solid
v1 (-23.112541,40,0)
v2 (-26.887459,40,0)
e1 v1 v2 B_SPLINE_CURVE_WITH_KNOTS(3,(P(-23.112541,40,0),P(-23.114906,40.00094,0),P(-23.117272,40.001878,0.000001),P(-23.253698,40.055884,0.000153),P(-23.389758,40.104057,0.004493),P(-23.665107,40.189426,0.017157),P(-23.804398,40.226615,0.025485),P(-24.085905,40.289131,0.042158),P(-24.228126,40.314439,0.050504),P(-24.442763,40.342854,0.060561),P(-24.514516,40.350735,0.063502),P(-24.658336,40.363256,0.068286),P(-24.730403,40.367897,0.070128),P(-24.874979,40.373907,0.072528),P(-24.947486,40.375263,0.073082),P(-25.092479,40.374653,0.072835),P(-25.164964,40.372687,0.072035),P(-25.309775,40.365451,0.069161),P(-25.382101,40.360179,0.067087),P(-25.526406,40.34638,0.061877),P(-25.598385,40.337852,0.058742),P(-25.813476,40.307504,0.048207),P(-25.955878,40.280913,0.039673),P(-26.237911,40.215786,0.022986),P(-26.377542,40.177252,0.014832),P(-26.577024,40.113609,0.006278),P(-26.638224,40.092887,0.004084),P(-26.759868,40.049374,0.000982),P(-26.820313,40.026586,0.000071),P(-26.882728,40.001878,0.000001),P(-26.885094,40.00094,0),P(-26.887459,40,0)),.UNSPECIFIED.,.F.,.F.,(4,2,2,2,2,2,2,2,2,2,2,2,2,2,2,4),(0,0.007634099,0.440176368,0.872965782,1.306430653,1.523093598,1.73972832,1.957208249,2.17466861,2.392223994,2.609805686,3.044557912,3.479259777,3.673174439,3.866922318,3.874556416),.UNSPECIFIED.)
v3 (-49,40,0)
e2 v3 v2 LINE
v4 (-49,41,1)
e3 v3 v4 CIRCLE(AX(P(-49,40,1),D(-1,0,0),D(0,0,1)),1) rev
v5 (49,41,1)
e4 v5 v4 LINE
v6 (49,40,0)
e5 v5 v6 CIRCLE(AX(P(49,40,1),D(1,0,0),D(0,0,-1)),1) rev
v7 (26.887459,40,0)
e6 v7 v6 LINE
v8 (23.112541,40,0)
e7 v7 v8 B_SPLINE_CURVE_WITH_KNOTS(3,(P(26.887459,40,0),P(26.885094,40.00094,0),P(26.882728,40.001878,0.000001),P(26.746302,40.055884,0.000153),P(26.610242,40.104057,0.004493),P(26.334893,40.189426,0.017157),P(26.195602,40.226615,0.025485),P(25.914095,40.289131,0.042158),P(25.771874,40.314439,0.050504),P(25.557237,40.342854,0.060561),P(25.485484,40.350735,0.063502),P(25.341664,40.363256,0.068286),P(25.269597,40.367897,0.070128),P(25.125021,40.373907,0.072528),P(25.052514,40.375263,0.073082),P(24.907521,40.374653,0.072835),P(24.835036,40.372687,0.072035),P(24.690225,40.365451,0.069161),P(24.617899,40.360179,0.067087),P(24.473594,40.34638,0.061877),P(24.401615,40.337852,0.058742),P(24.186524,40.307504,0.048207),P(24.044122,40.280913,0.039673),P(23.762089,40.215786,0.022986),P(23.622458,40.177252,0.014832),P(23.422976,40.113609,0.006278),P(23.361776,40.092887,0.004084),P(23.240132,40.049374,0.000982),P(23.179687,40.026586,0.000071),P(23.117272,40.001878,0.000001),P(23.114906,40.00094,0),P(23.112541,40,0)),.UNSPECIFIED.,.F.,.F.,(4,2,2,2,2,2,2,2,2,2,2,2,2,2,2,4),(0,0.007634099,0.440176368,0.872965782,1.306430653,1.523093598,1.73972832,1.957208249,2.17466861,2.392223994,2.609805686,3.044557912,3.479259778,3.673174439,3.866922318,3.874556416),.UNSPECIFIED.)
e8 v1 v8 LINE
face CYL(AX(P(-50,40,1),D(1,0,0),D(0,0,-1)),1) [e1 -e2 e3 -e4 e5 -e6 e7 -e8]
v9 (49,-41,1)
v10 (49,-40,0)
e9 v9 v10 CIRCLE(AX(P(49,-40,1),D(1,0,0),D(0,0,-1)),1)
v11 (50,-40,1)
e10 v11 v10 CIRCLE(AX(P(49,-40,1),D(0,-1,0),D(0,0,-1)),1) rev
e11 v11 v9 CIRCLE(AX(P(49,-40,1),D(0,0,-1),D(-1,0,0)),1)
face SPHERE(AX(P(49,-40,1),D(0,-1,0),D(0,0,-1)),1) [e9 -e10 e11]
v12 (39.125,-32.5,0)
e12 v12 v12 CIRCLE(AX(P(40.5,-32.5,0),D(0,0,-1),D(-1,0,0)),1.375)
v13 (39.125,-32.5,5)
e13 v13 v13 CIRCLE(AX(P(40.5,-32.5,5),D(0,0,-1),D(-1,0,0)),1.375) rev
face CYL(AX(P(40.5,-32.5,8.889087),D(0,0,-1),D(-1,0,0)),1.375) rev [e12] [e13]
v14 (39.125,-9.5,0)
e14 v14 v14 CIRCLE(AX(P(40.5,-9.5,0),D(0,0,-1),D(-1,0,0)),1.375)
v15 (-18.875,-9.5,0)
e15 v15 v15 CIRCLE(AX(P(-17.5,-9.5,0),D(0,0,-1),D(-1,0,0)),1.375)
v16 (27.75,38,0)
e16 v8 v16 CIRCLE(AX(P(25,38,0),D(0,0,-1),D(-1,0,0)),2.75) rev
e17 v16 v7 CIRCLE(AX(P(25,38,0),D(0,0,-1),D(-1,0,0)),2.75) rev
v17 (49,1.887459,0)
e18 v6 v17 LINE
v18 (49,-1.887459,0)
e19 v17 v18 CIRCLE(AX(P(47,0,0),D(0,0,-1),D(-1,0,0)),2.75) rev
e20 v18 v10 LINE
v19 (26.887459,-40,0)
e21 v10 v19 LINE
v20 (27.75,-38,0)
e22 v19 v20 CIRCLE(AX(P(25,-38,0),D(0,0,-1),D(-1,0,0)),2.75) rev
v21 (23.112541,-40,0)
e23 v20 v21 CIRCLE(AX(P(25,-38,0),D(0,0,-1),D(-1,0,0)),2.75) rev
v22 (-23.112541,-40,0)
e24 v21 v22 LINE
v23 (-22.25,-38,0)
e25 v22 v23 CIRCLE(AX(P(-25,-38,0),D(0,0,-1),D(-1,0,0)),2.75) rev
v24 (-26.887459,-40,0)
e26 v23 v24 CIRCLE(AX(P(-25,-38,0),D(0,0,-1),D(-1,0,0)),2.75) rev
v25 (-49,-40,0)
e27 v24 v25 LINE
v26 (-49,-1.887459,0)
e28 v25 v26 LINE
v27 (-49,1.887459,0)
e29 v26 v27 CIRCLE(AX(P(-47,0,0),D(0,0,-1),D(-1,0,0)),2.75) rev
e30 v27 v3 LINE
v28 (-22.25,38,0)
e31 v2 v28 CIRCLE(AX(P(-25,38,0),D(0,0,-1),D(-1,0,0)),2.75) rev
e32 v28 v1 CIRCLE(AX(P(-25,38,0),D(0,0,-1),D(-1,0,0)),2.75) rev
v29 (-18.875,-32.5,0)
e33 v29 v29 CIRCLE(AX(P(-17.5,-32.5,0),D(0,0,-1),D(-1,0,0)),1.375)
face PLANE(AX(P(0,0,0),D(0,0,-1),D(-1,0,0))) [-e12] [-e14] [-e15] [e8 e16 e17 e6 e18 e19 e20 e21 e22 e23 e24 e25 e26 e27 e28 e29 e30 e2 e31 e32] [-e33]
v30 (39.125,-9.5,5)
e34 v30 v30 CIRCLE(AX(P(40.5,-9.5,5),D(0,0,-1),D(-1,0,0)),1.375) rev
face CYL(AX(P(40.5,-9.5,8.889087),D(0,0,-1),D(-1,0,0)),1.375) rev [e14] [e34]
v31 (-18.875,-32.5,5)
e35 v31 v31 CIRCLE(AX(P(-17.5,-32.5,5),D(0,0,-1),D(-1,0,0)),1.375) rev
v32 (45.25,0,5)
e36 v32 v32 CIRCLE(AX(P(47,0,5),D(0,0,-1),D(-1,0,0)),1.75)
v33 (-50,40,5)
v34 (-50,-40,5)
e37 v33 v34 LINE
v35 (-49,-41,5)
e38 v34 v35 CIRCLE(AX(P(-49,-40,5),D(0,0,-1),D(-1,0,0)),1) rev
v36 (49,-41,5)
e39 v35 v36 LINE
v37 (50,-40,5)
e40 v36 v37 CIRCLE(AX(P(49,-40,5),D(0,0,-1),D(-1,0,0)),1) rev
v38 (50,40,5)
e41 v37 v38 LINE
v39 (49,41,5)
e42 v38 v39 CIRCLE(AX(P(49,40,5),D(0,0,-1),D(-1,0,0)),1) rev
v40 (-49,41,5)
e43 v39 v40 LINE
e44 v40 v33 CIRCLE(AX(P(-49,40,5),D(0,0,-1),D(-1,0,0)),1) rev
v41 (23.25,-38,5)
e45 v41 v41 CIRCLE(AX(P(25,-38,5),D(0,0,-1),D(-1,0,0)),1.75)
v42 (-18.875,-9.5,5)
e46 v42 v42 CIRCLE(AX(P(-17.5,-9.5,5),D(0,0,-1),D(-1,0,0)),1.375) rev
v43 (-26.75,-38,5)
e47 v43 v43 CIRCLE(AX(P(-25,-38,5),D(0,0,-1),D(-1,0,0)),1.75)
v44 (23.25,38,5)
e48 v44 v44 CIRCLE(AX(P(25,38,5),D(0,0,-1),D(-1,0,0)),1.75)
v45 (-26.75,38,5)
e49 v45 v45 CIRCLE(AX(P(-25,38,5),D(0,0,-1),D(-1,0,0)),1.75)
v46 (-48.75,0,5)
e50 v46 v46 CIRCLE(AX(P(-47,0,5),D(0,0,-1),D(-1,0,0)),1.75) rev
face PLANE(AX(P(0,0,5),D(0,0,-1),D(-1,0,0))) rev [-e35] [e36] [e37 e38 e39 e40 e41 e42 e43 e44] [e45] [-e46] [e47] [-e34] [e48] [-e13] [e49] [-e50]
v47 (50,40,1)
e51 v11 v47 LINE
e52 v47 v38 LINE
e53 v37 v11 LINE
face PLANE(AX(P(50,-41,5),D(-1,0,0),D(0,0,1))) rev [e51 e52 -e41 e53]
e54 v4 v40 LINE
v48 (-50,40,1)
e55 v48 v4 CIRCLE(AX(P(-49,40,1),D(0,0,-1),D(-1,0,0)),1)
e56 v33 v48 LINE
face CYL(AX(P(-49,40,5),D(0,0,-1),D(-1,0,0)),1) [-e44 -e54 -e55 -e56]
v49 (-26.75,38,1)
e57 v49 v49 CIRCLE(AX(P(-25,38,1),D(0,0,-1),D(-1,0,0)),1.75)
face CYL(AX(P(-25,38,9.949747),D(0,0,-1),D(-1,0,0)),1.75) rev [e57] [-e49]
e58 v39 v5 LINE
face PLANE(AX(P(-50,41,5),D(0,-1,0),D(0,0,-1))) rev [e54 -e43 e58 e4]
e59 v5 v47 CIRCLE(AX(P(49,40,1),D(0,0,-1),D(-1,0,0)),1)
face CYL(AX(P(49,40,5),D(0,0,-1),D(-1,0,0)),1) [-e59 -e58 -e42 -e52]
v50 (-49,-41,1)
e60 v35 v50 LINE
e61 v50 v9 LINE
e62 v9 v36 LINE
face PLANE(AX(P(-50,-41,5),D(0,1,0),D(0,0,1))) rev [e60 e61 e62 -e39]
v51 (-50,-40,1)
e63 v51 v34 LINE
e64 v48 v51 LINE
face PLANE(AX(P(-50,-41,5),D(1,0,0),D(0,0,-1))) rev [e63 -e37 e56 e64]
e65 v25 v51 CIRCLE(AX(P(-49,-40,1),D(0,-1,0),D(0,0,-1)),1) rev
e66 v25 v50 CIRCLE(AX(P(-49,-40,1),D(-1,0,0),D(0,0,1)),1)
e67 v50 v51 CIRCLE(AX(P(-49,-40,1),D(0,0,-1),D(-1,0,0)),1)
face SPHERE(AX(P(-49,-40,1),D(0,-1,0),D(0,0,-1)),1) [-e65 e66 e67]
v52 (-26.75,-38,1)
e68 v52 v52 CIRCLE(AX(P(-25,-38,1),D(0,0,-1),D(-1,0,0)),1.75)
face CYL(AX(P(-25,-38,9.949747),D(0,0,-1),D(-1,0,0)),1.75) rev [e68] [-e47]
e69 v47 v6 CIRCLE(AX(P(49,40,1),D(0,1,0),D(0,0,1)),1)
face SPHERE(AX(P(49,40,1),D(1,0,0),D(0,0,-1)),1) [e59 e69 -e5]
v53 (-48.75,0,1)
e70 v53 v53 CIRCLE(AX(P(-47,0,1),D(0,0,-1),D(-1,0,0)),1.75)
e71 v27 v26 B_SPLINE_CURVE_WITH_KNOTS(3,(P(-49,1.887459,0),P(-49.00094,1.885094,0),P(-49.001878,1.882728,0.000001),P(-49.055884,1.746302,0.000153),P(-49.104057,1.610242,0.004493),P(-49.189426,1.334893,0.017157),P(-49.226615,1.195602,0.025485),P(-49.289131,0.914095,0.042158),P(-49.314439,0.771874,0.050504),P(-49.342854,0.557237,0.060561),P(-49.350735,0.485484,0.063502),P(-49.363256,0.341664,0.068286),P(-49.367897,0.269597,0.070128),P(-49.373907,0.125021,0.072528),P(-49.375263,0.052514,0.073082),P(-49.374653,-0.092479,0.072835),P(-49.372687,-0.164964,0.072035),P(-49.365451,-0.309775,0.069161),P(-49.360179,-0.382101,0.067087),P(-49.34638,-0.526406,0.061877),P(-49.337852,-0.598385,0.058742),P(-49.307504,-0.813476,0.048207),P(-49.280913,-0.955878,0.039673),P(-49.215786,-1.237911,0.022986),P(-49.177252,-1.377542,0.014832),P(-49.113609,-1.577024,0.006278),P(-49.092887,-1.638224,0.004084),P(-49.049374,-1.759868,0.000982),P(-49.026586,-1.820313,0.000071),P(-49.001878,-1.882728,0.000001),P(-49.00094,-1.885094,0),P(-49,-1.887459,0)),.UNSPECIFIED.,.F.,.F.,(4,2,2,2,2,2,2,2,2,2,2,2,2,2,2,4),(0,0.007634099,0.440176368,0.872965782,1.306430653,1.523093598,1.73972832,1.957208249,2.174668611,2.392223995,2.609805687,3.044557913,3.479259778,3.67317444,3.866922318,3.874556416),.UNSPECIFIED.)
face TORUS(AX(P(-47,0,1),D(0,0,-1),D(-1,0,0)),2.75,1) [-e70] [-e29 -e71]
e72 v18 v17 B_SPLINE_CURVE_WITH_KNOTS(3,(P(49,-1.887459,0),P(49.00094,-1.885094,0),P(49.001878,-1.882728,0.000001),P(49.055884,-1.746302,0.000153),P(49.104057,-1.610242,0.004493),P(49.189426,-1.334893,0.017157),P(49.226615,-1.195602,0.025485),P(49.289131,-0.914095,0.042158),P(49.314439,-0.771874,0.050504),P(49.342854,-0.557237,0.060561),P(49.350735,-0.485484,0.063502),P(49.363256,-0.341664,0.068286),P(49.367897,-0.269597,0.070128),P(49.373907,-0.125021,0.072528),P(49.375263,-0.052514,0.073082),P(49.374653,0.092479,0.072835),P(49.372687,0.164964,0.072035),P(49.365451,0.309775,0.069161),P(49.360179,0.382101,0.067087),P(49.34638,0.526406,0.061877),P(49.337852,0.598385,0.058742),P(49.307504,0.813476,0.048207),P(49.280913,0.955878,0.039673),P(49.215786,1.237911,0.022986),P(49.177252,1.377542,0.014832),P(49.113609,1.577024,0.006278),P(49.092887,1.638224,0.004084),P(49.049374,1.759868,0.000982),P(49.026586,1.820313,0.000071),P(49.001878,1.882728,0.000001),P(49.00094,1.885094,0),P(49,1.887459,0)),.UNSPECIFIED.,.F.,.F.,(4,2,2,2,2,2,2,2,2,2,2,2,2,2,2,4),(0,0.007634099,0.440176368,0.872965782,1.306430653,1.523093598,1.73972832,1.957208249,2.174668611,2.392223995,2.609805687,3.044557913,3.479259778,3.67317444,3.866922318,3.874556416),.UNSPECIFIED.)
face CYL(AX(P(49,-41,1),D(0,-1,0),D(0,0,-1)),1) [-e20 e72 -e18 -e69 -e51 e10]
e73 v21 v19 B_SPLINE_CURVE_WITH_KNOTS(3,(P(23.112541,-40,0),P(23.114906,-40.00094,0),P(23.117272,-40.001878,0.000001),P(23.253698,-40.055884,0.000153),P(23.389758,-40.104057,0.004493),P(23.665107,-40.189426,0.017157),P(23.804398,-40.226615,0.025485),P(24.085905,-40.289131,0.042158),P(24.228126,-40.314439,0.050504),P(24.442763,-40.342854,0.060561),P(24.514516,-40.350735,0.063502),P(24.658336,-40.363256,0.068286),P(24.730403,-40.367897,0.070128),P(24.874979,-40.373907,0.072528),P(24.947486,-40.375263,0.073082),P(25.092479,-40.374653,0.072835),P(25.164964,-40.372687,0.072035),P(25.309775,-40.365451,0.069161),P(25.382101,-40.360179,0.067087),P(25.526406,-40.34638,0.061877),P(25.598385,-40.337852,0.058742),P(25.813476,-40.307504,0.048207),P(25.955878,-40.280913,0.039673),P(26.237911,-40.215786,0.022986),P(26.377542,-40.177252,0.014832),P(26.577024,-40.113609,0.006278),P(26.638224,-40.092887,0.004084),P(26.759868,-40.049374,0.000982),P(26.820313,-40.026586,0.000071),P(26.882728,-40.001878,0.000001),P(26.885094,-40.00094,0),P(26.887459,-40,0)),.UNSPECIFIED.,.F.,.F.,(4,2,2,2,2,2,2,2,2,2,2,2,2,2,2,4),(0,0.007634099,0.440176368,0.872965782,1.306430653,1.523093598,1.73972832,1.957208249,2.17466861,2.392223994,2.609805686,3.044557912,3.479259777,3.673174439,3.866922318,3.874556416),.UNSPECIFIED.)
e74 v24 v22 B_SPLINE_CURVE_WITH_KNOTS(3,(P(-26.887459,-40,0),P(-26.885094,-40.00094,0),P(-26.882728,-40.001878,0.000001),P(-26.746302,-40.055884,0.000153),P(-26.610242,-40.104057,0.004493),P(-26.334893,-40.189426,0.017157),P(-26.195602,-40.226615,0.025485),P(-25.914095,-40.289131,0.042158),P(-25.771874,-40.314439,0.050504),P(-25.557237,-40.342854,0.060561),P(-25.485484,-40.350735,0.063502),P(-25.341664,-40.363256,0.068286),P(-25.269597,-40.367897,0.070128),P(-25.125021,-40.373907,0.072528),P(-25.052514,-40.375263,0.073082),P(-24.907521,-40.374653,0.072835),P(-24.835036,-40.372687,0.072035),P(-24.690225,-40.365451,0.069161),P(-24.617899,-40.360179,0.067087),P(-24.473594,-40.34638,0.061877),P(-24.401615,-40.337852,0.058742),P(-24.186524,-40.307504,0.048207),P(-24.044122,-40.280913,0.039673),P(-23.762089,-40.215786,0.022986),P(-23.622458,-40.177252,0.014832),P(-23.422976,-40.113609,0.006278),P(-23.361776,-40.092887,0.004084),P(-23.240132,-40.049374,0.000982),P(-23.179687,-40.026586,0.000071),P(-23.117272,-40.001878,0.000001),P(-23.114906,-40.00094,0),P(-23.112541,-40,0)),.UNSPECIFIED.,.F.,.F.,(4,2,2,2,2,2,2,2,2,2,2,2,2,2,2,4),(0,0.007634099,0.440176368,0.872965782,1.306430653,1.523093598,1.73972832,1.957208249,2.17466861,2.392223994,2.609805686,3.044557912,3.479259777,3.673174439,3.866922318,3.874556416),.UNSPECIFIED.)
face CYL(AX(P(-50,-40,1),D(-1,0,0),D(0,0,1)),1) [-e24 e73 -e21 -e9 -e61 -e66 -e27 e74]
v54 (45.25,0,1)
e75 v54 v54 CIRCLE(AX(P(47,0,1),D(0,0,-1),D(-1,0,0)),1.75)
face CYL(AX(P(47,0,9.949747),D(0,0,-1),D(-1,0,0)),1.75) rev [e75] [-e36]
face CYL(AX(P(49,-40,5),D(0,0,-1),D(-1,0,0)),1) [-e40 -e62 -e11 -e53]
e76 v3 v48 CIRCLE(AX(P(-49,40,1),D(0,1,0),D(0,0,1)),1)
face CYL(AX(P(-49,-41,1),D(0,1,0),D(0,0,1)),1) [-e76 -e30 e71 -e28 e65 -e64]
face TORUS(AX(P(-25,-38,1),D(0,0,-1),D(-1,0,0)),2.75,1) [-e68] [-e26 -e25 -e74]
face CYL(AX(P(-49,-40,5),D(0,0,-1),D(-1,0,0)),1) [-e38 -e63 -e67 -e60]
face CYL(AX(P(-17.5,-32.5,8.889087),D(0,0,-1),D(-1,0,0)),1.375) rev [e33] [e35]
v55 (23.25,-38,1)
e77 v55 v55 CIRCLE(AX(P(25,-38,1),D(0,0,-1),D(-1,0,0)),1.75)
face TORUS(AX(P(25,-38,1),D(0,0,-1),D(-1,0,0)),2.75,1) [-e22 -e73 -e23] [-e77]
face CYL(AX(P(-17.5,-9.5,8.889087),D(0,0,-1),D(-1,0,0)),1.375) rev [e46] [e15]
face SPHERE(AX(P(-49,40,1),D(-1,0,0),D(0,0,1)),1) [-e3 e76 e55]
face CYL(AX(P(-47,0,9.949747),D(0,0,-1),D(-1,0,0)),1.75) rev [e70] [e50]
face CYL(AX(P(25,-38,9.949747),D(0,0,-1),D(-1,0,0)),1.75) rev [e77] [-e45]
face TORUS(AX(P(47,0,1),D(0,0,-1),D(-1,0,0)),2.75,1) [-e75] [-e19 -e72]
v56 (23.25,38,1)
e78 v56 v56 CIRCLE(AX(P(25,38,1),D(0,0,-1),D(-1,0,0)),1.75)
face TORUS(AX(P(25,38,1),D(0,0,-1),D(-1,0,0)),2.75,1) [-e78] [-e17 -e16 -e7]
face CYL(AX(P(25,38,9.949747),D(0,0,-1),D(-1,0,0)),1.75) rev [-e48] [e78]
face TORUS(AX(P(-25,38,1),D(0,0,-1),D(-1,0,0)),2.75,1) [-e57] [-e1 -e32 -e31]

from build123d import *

# Parameters (mm, degrees)
ESQUISSE1_W             = 100
ESQUISSE1_H             = 82
BOSS_EXTRU_1_DEPTH      = 5
ESQUISSE2_R             = 1.75
ENL_V_MAT_EXTRU_1_DEPTH = 5
ESQUISSE3_R             = 1.75
ENL_V_MAT_EXTRU_2_DEPTH = 5
CONG_2_R                = 1
ESQUISSE8_R             = 1.375
ENL_V_MAT_EXTRU_6_DEPTH = 5


with BuildPart() as part:
    # Esquisse1 → Boss.-Extru.1 (new body)
    with BuildSketch(Plane.XY):
        Rectangle(ESQUISSE1_W, ESQUISSE1_H)
    extrude(amount=BOSS_EXTRU_1_DEPTH)

    # Esquisse2 → Enlèv. mat.-Extru.1 (cut)
    with BuildSketch(Plane.XY):
        with Locations(Location((-25, -38, 0), (0, 0, 180))):
            Circle(ESQUISSE2_R)
        with Locations(Location((25, -38, 0), (0, 0, 180))):
            Circle(ESQUISSE2_R)
        with Locations(Location((-25, 38, 0), (0, 0, 180))):
            Circle(ESQUISSE2_R)
        with Locations(Location((25, 38, 0), (0, 0, 180))):
            Circle(ESQUISSE2_R)
    extrude(amount=ENL_V_MAT_EXTRU_1_DEPTH, mode=Mode.SUBTRACT)

    # Esquisse3 → Enlèv. mat.-Extru.2 (cut)
    with BuildSketch(Plane.XY):
        with Locations(Location((47, 0, 0), (0, 0, 180))):
            Circle(ESQUISSE3_R)
    enl_v_mat_extru_2 = extrude(amount=ENL_V_MAT_EXTRU_2_DEPTH, mode=Mode.SUBTRACT)

    # Symétrie1: Enlèv. mat.-Extru.2 across plane
    add(enl_v_mat_extru_2.mirror(Plane(origin=(0, 0, 0), x_dir=(0, 0, 1), z_dir=(1, 0, 0))), mode=Mode.SUBTRACT)

    # Congé2
    # the kernel refuses this fillet: 1 mm, written as the material it takes off along each edge
    with BuildSketch(Plane(origin=(-49, -40, 1), x_dir=(-1, 0, 0), z_dir=(0, -1, 0))) as cong_2_piece_1_section:
        Polygon((0, 0), (CONG_2_R, 0), (CONG_2_R, CONG_2_R), (0, CONG_2_R), align=None)
    cong_2_piece_1 = extrude(amount=CONG_2_R, mode=Mode.PRIVATE)
    cong_2_piece_1 = cong_2_piece_1 - Plane(origin=(-49, -40, 1), x_dir=(0.7071067811865475, 0, 0.7071067811865475), z_dir=(0, -1, 0)) * Sphere(CONG_2_R, mode=Mode.PRIVATE)
    add(cong_2_piece_1, mode=Mode.SUBTRACT)
    with BuildSketch(Plane(origin=(49, -40, 1), x_dir=(1, 0, 0), z_dir=(0, -1, 0))) as cong_2_piece_2_section:
        Polygon((0, 0), (CONG_2_R, 0), (CONG_2_R, -CONG_2_R), (0, -CONG_2_R), align=None)
    cong_2_piece_2 = extrude(amount=CONG_2_R, mode=Mode.PRIVATE)
    cong_2_piece_2 = cong_2_piece_2 - Plane(origin=(49, -40, 1), x_dir=(-0.7071067811865475, 0, 0.7071067811865475), z_dir=(0, -1, 0)) * Sphere(CONG_2_R, mode=Mode.PRIVATE)
    add(cong_2_piece_2, mode=Mode.SUBTRACT)
    with BuildSketch(Plane(origin=(-49, 40, 1), x_dir=(0, 0, -1), z_dir=(-1, 0, 0))) as cong_2_piece_3_section:
        Polygon((0, 0), (CONG_2_R, 0), (CONG_2_R, -CONG_2_R), (0, -CONG_2_R), align=None)
    cong_2_piece_3 = extrude(amount=CONG_2_R, mode=Mode.PRIVATE)
    cong_2_piece_3 = cong_2_piece_3 - Plane(origin=(-49, 40, 1), x_dir=(0, -0.7071067811865475, 0.7071067811865475), z_dir=(-1, 0, 0)) * Sphere(CONG_2_R, mode=Mode.PRIVATE)
    add(cong_2_piece_3, mode=Mode.SUBTRACT)
    with BuildSketch(Plane(origin=(49, 40, 1), x_dir=(0, 0, -1), z_dir=(1, 0, 0))) as cong_2_piece_4_section:
        Polygon((0, 0), (CONG_2_R, 0), (CONG_2_R, CONG_2_R), (0, CONG_2_R), align=None)
    cong_2_piece_4 = extrude(amount=CONG_2_R, mode=Mode.PRIVATE)
    cong_2_piece_4 = cong_2_piece_4 - Plane(origin=(49, 40, 1), x_dir=(0, -0.7071067811865475, 0.7071067811865475), z_dir=(1, 0, 0)) * Sphere(CONG_2_R, mode=Mode.PRIVATE)
    add(cong_2_piece_4, mode=Mode.SUBTRACT)
    with BuildSketch(Plane(origin=(25, -38, 0), x_dir=(-1, 0, 0), z_dir=(0, 1, 0))) as cong_2_piece_5:
        with BuildLine():
            CenterArc((1.75 + CONG_2_R, CONG_2_R), CONG_2_R, 180, 90)
            Line((1.75, CONG_2_R), (1.75, 0))
            Line((1.75, 0), (1.75 + CONG_2_R, 0))
        make_face()
    revolve(axis=Axis((25, -38, 0), (0, 0, 1)), mode=Mode.SUBTRACT)
    with BuildSketch(Plane(origin=(-25, 38, 0), x_dir=(-1, 0, 0), z_dir=(0, 1, 0))) as cong_2_piece_6:
        with BuildLine():
            CenterArc((1.75 + CONG_2_R, CONG_2_R), CONG_2_R, 180, 90)
            Line((1.75, CONG_2_R), (1.75, 0))
            Line((1.75, 0), (1.75 + CONG_2_R, 0))
        make_face()
    revolve(axis=Axis((-25, 38, 0), (0, 0, 1)), mode=Mode.SUBTRACT)
    with BuildSketch(Plane(origin=(25, 38, 0), x_dir=(-1, 0, 0), z_dir=(0, 1, 0))) as cong_2_piece_7:
        with BuildLine():
            CenterArc((1.75 + CONG_2_R, CONG_2_R), CONG_2_R, 180, 90)
            Line((1.75, CONG_2_R), (1.75, 0))
            Line((1.75, 0), (1.75 + CONG_2_R, 0))
        make_face()
    revolve(axis=Axis((25, 38, 0), (0, 0, 1)), mode=Mode.SUBTRACT)
    with BuildSketch(Plane(origin=(-25, -38, 0), x_dir=(-1, 0, 0), z_dir=(0, 1, 0))) as cong_2_piece_8:
        with BuildLine():
            CenterArc((1.75 + CONG_2_R, CONG_2_R), CONG_2_R, 180, 90)
            Line((1.75, CONG_2_R), (1.75, 0))
            Line((1.75, 0), (1.75 + CONG_2_R, 0))
        make_face()
    revolve(axis=Axis((-25, -38, 0), (0, 0, 1)), mode=Mode.SUBTRACT)
    with BuildSketch(Plane(origin=(47, 0, 0), x_dir=(-1, 0, 0), z_dir=(0, 1, 0))) as cong_2_piece_9:
        with BuildLine():
            CenterArc((1.75 + CONG_2_R, CONG_2_R), CONG_2_R, 180, 90)
            Line((1.75, CONG_2_R), (1.75, 0))
            Line((1.75, 0), (1.75 + CONG_2_R, 0))
        make_face()
    revolve(axis=Axis((47, 0, 0), (0, 0, 1)), mode=Mode.SUBTRACT)
    with BuildSketch(Plane(origin=(-47, 0, 0), x_dir=(1, 0, 0), z_dir=(0, 1, 0))) as cong_2_piece_10:
        with BuildLine():
            CenterArc((1.75 + CONG_2_R, -CONG_2_R), CONG_2_R, 90, 90)
            Line((1.75, -CONG_2_R), (1.75, 0))
            Line((1.75, 0), (1.75 + CONG_2_R, 0))
        make_face()
    revolve(axis=Axis((-47, 0, 0), (0, 0, -1)), mode=Mode.SUBTRACT)
    with BuildSketch(Plane(origin=(-49, -41, 0), x_dir=(0, 0, 1), z_dir=(1, 0, 0))) as cong_2_piece_11:
        with BuildLine():
            CenterArc((CONG_2_R, -CONG_2_R), CONG_2_R, 90, 90)
            Line((0, -CONG_2_R), (0, 0))
            Line((0, 0), (CONG_2_R, 0))
        make_face()
    extrude(amount=98, mode=Mode.SUBTRACT)
    with BuildSketch(Plane(origin=(-50, 40, 0), x_dir=(0, 0, 1), z_dir=(0, -1, 0)), Plane(origin=(50, -40, 0), x_dir=(0, 0, 1), z_dir=(0, 1, 0))) as cong_2_piece_12:
        with BuildLine():
            CenterArc((CONG_2_R, -CONG_2_R), CONG_2_R, 90, 90)
            Line((0, -CONG_2_R), (0, 0))
            Line((0, 0), (CONG_2_R, 0))
        make_face()
    extrude(amount=80, mode=Mode.SUBTRACT)
    with BuildSketch(Plane(origin=(49, 41, 0), x_dir=(0, -1, 0), z_dir=(-1, 0, 0))) as cong_2_piece_13:
        with BuildLine():
            CenterArc((CONG_2_R, CONG_2_R), CONG_2_R, 180, 90)
            Line((0, CONG_2_R), (0, 0))
            Line((0, 0), (CONG_2_R, 0))
        make_face()
    extrude(amount=98, mode=Mode.SUBTRACT)
    with BuildSketch(Plane(origin=(50, -41, 1), x_dir=(-1, 0, 0), z_dir=(0, 0, 1)), Plane(origin=(50, 41, 1), x_dir=(0, -1, 0), z_dir=(0, 0, 1))) as cong_2_piece_14:
        with BuildLine():
            CenterArc((CONG_2_R, -CONG_2_R), CONG_2_R, 90, 90)
            Line((0, -CONG_2_R), (0, 0))
            Line((0, 0), (CONG_2_R, 0))
        make_face()
    extrude(amount=6.5, mode=Mode.SUBTRACT)
    with BuildSketch(Plane(origin=(-50, -41, 1), x_dir=(1, 0, 0), z_dir=(0, 0, 1)), Plane(origin=(-50, 41, 1), x_dir=(0, -1, 0), z_dir=(0, 0, 1))) as cong_2_piece_15:
        with BuildLine():
            CenterArc((CONG_2_R, CONG_2_R), CONG_2_R, 180, 90)
            Line((0, CONG_2_R), (0, 0))
            Line((0, 0), (CONG_2_R, 0))
        make_face()
    extrude(amount=6.5, mode=Mode.SUBTRACT)

    # Esquisse8 → Enlèv. mat.-Extru.6 (cut)
    with BuildSketch(Plane(origin=(0, 0, 0), x_dir=(-1, 0, 0), z_dir=(0, 0, -1))):
        with Locations((-40.5, -9.5)):
            Circle(ESQUISSE8_R)
        with Locations((17.5, -9.5)):
            Circle(ESQUISSE8_R)
        with Locations((17.5, -32.5)):
            Circle(ESQUISSE8_R)
        with Locations((-40.5, -32.5)):
            Circle(ESQUISSE8_R)
    extrude(amount=-ENL_V_MAT_EXTRU_6_DEPTH, mode=Mode.SUBTRACT)


solid = part.part
